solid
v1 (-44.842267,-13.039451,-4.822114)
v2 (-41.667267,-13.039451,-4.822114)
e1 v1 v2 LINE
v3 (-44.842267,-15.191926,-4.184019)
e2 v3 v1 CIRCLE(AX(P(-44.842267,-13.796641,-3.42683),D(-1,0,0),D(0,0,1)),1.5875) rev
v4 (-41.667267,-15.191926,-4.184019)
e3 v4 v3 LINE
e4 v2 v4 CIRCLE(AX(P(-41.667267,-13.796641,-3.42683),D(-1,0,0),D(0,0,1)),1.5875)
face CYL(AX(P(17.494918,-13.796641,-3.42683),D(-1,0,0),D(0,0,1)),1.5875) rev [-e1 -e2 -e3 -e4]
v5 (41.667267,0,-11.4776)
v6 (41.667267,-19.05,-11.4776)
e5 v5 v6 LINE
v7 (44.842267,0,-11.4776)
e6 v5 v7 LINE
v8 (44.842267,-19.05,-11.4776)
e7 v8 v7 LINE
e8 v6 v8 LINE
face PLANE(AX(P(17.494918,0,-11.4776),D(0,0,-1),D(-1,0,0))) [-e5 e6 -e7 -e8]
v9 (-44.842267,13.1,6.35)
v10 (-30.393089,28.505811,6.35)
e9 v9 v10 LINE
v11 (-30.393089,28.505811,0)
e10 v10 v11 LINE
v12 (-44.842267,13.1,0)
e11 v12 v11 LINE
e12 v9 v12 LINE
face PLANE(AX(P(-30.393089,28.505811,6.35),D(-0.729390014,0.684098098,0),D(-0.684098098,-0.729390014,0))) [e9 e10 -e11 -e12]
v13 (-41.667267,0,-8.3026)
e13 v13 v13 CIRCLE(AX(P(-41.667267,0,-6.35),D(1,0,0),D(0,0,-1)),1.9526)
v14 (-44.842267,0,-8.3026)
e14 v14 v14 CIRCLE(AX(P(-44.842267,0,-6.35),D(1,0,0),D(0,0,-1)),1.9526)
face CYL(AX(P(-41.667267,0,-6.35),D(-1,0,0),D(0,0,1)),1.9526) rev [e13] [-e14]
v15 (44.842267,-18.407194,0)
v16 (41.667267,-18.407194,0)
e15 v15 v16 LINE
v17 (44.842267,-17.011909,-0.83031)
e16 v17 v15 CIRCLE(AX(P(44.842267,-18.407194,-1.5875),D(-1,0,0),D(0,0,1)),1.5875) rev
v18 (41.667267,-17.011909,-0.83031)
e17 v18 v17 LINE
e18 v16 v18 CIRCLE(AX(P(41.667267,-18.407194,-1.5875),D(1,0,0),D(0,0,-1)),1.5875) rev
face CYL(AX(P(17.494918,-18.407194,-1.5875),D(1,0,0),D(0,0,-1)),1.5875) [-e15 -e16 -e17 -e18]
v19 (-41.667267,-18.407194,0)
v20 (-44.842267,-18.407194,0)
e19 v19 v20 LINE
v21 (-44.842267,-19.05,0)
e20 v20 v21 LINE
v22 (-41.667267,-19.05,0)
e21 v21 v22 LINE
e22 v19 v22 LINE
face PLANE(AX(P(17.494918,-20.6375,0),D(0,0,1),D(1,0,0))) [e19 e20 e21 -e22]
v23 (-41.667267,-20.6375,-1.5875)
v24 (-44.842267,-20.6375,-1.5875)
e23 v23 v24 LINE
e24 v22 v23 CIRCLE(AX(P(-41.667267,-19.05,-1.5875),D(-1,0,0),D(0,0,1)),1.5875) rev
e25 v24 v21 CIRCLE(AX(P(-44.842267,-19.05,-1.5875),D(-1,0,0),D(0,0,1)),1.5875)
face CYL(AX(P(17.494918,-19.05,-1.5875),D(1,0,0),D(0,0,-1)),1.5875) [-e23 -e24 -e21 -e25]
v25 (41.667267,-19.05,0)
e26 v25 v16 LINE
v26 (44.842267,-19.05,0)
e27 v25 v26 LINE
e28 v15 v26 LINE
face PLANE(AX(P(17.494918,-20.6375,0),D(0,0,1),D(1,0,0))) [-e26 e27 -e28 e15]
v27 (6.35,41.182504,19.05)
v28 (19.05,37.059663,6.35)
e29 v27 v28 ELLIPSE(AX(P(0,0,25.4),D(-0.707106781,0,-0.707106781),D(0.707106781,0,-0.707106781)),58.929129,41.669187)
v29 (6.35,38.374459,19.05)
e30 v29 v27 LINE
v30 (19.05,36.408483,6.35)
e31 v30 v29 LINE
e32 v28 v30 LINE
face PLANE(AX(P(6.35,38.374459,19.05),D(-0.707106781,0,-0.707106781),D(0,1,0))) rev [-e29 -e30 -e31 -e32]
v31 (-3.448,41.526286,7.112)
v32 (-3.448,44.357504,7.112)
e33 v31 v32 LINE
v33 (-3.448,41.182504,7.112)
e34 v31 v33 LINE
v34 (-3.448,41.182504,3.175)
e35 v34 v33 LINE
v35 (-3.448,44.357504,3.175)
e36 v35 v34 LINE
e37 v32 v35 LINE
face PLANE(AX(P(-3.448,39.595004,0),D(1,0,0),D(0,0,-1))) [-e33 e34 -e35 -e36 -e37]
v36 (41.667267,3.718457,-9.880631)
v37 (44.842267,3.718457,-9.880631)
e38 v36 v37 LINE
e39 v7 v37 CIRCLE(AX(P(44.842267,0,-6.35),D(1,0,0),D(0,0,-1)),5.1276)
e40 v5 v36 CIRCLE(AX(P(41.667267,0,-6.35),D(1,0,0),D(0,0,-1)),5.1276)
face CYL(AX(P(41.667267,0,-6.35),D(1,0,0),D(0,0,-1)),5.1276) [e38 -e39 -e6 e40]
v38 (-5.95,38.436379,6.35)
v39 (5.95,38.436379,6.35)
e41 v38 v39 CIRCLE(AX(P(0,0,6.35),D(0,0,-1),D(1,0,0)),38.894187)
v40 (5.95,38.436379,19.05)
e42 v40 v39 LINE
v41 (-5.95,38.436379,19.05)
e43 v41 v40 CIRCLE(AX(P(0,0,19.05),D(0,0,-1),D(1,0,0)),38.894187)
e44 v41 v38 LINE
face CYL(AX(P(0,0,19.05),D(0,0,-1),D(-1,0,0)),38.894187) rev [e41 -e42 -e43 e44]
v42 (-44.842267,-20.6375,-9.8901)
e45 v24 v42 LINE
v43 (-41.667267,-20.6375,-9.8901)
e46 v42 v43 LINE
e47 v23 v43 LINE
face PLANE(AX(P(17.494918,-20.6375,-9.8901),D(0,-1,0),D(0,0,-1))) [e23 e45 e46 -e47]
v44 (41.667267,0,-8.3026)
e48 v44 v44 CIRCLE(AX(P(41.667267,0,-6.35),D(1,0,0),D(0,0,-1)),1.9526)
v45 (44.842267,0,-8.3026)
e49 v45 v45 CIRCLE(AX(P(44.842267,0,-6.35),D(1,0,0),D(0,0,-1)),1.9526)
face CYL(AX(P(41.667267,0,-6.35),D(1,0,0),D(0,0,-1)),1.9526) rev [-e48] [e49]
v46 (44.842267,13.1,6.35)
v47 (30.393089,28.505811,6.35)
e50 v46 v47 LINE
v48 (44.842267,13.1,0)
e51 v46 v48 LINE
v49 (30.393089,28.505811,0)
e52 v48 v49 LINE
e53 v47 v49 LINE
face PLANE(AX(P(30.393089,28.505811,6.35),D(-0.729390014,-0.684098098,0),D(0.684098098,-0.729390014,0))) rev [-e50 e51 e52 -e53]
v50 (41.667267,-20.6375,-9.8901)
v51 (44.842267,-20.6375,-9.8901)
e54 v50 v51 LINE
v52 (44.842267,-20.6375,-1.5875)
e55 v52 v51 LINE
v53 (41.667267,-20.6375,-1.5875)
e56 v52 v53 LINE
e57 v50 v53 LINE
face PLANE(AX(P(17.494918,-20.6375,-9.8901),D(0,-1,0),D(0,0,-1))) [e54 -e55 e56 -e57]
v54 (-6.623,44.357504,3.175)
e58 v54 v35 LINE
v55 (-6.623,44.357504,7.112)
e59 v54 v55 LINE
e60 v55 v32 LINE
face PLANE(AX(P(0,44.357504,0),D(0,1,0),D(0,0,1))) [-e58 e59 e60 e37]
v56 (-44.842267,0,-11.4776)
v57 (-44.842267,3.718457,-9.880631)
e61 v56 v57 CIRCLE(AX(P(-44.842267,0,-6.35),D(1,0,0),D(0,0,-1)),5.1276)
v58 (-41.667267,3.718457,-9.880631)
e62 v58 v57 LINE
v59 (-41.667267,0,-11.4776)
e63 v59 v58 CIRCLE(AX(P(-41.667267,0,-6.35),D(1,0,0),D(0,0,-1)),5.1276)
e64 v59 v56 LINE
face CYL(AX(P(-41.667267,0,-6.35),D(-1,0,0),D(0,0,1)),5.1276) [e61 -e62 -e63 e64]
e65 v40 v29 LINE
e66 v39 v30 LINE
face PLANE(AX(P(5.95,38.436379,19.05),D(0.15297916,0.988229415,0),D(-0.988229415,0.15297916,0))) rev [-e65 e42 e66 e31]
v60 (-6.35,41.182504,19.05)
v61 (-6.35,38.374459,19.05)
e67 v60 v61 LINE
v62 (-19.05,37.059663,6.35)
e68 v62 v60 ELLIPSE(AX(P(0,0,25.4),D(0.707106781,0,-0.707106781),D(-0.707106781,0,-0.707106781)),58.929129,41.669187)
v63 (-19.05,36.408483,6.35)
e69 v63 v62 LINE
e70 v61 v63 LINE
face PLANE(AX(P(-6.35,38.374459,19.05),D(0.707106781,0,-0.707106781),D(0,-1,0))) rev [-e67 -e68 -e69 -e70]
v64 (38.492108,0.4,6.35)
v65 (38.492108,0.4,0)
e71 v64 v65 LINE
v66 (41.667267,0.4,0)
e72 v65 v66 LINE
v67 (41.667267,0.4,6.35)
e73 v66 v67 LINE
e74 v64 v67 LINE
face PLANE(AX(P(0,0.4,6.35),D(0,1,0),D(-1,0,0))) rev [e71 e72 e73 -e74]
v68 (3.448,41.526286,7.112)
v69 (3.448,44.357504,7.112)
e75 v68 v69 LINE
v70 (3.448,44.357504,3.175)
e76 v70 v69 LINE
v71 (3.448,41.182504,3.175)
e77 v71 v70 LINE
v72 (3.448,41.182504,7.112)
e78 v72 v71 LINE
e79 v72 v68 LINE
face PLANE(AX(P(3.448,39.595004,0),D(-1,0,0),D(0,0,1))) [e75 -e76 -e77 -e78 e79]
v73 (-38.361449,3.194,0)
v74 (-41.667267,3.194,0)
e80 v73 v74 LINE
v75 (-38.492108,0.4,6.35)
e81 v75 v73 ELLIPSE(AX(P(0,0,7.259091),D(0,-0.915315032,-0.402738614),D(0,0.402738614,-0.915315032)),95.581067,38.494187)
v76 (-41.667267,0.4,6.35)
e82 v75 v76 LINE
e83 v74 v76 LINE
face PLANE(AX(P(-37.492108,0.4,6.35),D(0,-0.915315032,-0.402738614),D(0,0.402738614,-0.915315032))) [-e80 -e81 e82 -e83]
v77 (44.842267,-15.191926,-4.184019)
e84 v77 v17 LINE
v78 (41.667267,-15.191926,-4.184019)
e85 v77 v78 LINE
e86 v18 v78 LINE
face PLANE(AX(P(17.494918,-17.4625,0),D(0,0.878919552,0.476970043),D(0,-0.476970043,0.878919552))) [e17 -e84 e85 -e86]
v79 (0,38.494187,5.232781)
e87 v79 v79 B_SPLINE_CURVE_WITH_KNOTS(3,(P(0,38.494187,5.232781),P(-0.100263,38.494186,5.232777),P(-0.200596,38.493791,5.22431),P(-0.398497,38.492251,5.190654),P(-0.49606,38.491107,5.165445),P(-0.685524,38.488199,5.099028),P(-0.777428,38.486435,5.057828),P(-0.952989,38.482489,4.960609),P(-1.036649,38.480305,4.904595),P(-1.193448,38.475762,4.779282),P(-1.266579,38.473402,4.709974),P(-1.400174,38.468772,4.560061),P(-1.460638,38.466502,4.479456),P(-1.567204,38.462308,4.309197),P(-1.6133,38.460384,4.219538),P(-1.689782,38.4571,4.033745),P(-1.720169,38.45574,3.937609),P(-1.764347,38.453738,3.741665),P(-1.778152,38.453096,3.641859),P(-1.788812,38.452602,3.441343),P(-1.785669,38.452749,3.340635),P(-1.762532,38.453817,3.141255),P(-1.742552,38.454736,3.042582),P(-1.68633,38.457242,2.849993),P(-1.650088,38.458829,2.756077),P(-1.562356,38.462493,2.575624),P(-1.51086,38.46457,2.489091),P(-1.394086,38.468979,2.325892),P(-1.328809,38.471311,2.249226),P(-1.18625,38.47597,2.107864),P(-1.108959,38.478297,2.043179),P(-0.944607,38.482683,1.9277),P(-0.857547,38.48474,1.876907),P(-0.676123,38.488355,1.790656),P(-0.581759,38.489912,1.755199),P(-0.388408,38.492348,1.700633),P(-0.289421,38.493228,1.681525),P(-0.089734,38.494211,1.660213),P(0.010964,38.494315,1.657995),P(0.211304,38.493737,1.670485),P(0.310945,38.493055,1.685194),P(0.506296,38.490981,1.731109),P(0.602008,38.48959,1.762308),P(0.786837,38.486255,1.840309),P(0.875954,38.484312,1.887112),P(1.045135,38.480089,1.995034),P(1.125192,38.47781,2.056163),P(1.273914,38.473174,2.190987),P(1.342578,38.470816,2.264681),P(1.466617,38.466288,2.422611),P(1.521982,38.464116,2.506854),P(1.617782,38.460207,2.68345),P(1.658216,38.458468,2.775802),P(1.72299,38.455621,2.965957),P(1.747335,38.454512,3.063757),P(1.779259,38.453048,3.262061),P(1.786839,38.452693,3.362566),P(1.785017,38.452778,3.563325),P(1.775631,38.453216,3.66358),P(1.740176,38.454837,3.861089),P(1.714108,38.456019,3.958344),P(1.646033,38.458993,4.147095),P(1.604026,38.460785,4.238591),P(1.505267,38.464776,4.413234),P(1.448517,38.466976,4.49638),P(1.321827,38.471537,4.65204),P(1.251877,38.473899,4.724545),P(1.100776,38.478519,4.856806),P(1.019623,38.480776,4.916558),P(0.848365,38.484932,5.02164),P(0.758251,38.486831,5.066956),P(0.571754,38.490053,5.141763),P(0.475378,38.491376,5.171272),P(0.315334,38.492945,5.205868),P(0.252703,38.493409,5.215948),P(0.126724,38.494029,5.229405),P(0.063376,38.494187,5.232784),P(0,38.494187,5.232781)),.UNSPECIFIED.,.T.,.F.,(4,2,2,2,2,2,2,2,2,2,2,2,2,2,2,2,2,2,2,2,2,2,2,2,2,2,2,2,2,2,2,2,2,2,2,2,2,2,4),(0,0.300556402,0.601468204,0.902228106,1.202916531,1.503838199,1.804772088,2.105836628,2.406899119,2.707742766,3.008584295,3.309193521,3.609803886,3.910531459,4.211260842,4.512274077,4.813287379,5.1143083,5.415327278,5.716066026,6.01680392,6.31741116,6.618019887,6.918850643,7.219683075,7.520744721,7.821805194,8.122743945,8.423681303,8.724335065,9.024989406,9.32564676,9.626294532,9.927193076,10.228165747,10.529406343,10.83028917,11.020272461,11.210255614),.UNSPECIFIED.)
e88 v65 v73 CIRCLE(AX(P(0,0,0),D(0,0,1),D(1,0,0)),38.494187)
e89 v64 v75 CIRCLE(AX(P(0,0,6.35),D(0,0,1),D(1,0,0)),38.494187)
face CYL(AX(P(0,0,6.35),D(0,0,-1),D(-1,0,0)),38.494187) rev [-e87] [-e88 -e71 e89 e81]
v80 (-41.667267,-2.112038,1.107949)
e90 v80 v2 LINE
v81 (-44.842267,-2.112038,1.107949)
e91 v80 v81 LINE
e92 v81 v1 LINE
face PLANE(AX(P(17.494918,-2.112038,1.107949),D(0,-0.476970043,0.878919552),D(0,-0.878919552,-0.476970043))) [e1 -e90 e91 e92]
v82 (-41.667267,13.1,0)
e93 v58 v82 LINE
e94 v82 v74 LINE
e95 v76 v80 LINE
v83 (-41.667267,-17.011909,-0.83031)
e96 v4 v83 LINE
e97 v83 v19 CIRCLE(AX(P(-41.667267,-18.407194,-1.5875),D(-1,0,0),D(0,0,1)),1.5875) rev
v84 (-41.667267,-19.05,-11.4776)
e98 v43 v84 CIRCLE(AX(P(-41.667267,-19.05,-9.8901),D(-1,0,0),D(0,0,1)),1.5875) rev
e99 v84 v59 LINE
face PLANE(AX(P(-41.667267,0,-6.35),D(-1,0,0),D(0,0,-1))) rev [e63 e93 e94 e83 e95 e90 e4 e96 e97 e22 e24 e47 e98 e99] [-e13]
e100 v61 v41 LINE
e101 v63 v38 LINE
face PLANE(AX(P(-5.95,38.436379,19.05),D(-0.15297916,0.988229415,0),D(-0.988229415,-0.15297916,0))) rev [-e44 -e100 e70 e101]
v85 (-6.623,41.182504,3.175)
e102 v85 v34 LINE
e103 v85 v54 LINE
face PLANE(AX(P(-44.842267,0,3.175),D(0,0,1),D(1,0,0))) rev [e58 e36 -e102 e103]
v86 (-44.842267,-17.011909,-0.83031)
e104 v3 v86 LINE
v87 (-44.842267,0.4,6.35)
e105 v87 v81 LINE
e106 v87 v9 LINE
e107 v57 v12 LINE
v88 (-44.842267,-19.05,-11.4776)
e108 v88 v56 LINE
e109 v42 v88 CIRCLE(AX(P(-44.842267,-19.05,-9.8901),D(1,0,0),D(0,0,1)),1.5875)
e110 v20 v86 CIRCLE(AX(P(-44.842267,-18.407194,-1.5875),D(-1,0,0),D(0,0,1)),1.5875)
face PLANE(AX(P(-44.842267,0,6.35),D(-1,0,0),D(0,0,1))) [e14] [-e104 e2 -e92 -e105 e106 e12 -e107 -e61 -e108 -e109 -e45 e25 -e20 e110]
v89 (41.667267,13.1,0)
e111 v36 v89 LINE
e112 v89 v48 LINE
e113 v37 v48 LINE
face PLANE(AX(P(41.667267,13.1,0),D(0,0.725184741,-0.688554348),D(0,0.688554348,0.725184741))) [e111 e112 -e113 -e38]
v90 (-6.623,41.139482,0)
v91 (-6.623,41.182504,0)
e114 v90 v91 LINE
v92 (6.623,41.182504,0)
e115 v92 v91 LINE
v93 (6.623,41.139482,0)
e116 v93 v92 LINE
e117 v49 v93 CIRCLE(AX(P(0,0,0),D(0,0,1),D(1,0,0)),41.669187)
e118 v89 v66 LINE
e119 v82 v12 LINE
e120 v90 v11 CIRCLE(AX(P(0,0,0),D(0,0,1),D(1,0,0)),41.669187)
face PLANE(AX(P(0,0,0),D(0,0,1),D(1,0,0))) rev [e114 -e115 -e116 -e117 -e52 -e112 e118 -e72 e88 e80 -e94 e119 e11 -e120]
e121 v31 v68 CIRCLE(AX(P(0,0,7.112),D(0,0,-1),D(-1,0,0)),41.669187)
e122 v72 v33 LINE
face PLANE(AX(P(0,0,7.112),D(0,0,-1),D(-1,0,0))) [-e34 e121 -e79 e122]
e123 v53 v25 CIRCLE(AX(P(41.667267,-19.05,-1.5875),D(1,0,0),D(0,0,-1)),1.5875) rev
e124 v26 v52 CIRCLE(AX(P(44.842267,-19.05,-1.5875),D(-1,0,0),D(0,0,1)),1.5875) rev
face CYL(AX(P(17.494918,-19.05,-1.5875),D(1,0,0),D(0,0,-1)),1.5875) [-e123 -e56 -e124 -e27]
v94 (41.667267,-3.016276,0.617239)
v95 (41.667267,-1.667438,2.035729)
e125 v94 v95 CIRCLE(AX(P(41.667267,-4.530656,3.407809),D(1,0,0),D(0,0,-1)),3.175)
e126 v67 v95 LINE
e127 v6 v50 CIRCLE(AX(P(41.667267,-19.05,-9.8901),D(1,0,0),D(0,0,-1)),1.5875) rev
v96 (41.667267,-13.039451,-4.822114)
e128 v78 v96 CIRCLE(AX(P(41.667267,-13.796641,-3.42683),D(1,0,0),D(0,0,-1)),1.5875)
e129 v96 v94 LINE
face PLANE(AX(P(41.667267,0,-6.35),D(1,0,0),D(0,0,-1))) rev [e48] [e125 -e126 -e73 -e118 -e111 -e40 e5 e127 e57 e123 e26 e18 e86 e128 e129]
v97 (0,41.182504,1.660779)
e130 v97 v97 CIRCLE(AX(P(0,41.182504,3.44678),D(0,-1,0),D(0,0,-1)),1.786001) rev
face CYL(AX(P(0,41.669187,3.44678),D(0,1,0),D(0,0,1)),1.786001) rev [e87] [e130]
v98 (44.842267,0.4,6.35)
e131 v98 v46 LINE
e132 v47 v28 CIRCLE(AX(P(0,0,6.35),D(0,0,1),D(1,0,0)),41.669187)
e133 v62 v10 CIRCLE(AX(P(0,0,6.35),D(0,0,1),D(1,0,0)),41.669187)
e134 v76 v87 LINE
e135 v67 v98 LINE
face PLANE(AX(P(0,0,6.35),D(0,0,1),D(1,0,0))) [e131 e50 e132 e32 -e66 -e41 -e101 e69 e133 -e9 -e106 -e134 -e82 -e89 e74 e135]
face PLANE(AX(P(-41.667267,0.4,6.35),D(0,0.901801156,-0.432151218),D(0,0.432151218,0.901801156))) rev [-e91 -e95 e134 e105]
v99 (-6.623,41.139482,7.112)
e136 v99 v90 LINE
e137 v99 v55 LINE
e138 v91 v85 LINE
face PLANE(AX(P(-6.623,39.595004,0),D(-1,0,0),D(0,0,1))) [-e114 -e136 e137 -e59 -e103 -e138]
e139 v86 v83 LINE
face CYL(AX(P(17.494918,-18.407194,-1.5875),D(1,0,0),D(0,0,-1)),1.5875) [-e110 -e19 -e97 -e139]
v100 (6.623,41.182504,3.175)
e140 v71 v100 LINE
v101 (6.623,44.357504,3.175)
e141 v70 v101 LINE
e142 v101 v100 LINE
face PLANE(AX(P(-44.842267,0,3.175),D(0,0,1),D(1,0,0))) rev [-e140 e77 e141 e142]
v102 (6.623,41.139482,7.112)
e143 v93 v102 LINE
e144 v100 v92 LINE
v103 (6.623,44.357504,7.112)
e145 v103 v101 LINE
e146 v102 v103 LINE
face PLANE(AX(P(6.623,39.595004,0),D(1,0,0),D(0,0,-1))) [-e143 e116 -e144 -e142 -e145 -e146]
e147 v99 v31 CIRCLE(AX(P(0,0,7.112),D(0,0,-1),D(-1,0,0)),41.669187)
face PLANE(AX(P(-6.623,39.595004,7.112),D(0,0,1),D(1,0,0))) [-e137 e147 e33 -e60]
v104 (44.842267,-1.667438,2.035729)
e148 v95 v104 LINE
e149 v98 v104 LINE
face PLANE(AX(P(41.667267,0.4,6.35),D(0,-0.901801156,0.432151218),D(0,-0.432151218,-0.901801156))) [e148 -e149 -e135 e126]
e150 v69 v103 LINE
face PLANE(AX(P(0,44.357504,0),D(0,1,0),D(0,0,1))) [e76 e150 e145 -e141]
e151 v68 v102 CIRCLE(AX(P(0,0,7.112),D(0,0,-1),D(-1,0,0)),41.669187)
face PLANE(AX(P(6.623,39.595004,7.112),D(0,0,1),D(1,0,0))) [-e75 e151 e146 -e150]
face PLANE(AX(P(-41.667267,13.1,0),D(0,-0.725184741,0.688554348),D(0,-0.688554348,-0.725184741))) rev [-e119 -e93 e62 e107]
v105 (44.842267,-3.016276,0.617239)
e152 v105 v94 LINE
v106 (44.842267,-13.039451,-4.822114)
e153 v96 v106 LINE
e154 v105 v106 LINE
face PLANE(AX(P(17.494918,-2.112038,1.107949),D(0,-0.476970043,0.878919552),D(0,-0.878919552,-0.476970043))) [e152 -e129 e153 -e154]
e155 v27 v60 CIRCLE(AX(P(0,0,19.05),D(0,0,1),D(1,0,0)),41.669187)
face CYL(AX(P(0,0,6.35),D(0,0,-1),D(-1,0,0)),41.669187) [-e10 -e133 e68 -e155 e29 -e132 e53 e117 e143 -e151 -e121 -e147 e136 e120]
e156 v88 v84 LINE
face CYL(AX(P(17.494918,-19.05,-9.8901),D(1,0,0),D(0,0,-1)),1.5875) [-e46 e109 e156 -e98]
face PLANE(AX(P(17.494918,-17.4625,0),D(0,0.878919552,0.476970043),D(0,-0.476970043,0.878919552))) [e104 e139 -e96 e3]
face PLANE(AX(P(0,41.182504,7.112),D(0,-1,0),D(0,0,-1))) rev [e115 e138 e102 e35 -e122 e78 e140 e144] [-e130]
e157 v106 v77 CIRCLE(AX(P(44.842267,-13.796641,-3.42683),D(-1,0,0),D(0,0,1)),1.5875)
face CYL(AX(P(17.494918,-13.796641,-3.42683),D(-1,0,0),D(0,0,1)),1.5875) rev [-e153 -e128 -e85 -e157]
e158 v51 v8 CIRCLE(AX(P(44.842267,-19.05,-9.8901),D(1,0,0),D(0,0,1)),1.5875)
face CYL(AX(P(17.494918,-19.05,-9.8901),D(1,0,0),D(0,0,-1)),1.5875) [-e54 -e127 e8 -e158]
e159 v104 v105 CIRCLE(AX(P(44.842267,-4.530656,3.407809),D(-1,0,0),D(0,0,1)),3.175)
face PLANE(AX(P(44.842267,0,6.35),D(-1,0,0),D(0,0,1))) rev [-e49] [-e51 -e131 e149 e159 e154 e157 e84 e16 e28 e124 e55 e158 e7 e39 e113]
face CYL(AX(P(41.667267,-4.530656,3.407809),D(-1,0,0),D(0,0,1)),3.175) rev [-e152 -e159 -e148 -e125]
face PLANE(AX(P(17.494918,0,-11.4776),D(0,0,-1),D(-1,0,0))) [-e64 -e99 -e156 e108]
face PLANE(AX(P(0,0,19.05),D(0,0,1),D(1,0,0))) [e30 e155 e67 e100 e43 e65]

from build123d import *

# Parameters (mm, degrees)
BOSS_EXTRUDE1_DEPTH                 = 6.35
SKETCH2_R                           = 1.9526
BOSS_EXTRUDE2_DEPTH                 = 3.175
CUT_EXTRUDE1_DEPTH                  = 3.175158
CUT_EXTRUDE1_DIRECTION_2_REACH      = 95.876
CUT_EXTRUDE1_DIRECTION_2_END_RADIUS = 38.494186542
BOSS_EXTRUDE3_DEPTH                 = 12.7
CHAMFER2_SIZE                       = 12.7
F_9_64_0_14063_DIAMETER_HOLE1_D     = 3.572002
CUT_EXTRUDE4_DEPTH                  = 7.112
BOSS_EXTRUDE4_DEPTH                 = 3.175
BOSS_EXTRUDE4_DEPTH_BACK            = 1.5875
SKETCH12_W                          = 3.175
SKETCH12_H                          = 7.112
BOSS_EXTRUDE6_START                 = -89.684533
BOSS_EXTRUDE6_DEPTH                 = 89.684533
FILLET5_R                           = 3.175
SKETCH18_W                          = 83.334533228
SKETCH18_H                          = 26.913353796
CUT_EXTRUDE8_DEPTH                  = 71.073899328
CUT_EXTRUDE6_DEPTH                  = 71.563193649
CUT_EXTRUDE6_DEPTH_BACK             = 71.563193649
SKETCH15_W                          = 3.175
SKETCH15_H                          = 3.175
FILLET6_R                           = 1.5875


with BuildPart() as part:
    # Sketch1 → Boss-Extrude1 (new body)
    with BuildSketch(Plane.XY):
        with BuildLine():
            Line((44.842266614, 13.1), (30.393088537, 28.505811271))
            ThreePointArc((30.393088537, 28.505811271), (0, 41.669186542), (-30.393088537, 28.505811271))
            Line((-30.393088537, 28.505811271), (-44.842266614, 13.1))
            Line((-44.842266614, 13.1), (-44.842266614, 0.4))
            Line((-44.842266614, 0.4), (-41.667266614, 0.4))
            Line((-41.667266614, 0.4), (-38.49210825, 0.4))
            ThreePointArc((-38.49210825, 0.4), (0, 38.494186542), (38.49210825, 0.4))
            Line((38.49210825, 0.4), (41.667266614, 0.4))
            Line((41.667266614, 0.4), (44.842266614, 0.4))
            Line((44.842266614, 0.4), (44.842266614, 13.1))
        make_face()
    extrude(amount=BOSS_EXTRUDE1_DEPTH)

    # Sketch2 → Boss-Extrude2 (add)
    with BuildSketch(Plane(origin=(44.842266614, 0, 0), x_dir=(0, 0, -1), z_dir=(1, 0, 0))):
        with BuildLine():
            Line((0, 13.1), (9.880631277, 3.71845728))
            ThreePointArc((9.880631277, 3.71845728), (10.572747241, -2.908726095), (4.134101417, -4.624075608))
            Line((4.134101417, -4.624075608), (-6.35, 0.4))
            Line((-6.35, 0.4), (0, 0.4))
            Line((0, 0.4), (0, 13.1))
        make_face()
        with Locations((6.35, 0)):
            Circle(SKETCH2_R, mode=Mode.SUBTRACT)
    boss_extrude2 = extrude(amount=-BOSS_EXTRUDE2_DEPTH)

    # Mirror1: Boss-Extrude2 across plane
    add(boss_extrude2.mirror(Plane(origin=(0, 0, 0), x_dir=(0, 0, 1), z_dir=(1, 0, 0))))

    # Sketch4 → Cut-Extrude1 (cut)
    with BuildSketch(Plane(origin=(-38.49210825, 0, 0), x_dir=(0, 0, -1), z_dir=(1, 0, 0))):
        Polygon((-6.35, 0.4), (0, 3.194), (0, 0.4), align=None)
    extrude(amount=-CUT_EXTRUDE1_DEPTH, mode=Mode.SUBTRACT)

    # Cut-Extrude1 direction 2: up to this cylinder (the profile starts outside it)
    cut_extrude1_direction_2_end = Plane(origin=(0, 0, 2.116667), z_dir=(0, 0, -1)) * Cylinder(CUT_EXTRUDE1_DIRECTION_2_END_RADIUS, 269.740373084, mode=Mode.PRIVATE)
    # Sketch4 → Cut-Extrude1 direction 2 (cut, up to the surface)
    with BuildSketch(Plane(origin=(-38.49210825, 0, 0), x_dir=(0, 0, -1), z_dir=(1, 0, 0)), mode=Mode.PRIVATE) as cut_extrude1_direction_2_sk1:
        Polygon((-6.35, 0.4), (0, 3.194), (0, 0.4), align=None)
    cut_extrude1_direction_2_tool1 = extrude(cut_extrude1_direction_2_sk1.sketch, amount=CUT_EXTRUDE1_DIRECTION_2_REACH, mode=Mode.PRIVATE) - cut_extrude1_direction_2_end
    add(cut_extrude1_direction_2_tool1.solids().sort_by_distance((-38.492108, 1.331333, 2.116667))[0], mode=Mode.SUBTRACT)

    # Sketch5 → Boss-Extrude3 (add)
    with BuildSketch(Plane.XY.offset(6.35)):
        with BuildLine():
            Line((-6.35, 38.374458705), (-6.35, 41.182503652))
            ThreePointArc((-6.35, 41.182503652), (0, 41.669186542), (6.35, 41.182503652))
            Line((6.35, 41.182503652), (6.35, 38.374458705))
            Line((6.35, 38.374458705), (5.95, 38.43637921))
            ThreePointArc((5.95, 38.43637921), (0, 38.894186542), (-5.95, 38.43637921))
            Line((-5.95, 38.43637921), (-6.35, 38.374458705))
        make_face()
    extrude(amount=BOSS_EXTRUDE3_DEPTH)

    # Chamfer2
    # the kernel refuses this chamfer: 12.7 mm, written as the material it adds along each edge
    with BuildSketch(Plane(origin=(6.35, 73.842877599, 6.35), x_dir=(0.9996219169112968, 0, -0.02749587661058633), z_dir=(0, -1, 0))) as chamfer2_piece_1_section:
        Polygon((CHAMFER2_SIZE * 0.999621916911, CHAMFER2_SIZE * 0.0274958766106), (-CHAMFER2_SIZE * 0.0274958766106, CHAMFER2_SIZE * 0.999621916911), (0, 0), align=None)
    chamfer2_piece_1 = extrude(amount=68.128792841, mode=Mode.PRIVATE)
    chamfer2_piece_1 = chamfer2_piece_1 & Plane(origin=(0, 0, 10.815604597), x_dir=(0.7293900135753609, 0.6840980982991656, 0), z_dir=(0, 0, -1)) * Cylinder(41.669186542, 188, mode=Mode.PRIVATE)
    chamfer2_piece_1 = split(chamfer2_piece_1, bisect_by=Plane(origin=(9.796586026, 37.840922839, 10.815604597), z_dir=(0.15297916035843936, 0.988229414911349, 0)), keep=Keep.TOP, mode=Mode.PRIVATE)
    chamfer2_piece_1 = split(chamfer2_piece_1, bisect_by=Plane(origin=(9.988062905, 39.077843499, 19.05), z_dir=(0, 0, -1)), keep=Keep.TOP, mode=Mode.PRIVATE)
    add(chamfer2_piece_1)
    with BuildSketch(Plane(origin=(-6.35, 5.714084758, 6.35), x_dir=(-0.9996219169112966, 0, -0.0274958766105864), z_dir=(0, 1, 0))) as chamfer2_piece_2_section:
        Polygon((CHAMFER2_SIZE * 0.999621916911, CHAMFER2_SIZE * 0.0274958766106), (-CHAMFER2_SIZE * 0.0274958766106, CHAMFER2_SIZE * 0.999621916911), (0, 0), align=None)
    chamfer2_piece_2 = extrude(amount=68.128792841, mode=Mode.PRIVATE)
    chamfer2_piece_2 = chamfer2_piece_2 & Plane(origin=(0, 0, 10.81560458), x_dir=(0.7293900135753609, 0.6840980982991656, 0), z_dir=(0, 0, -1)) * Cylinder(41.669186542, 188, mode=Mode.PRIVATE)
    chamfer2_piece_2 = split(chamfer2_piece_2, bisect_by=Plane(origin=(-9.796586033, 37.840922838, 10.81560458), z_dir=(-0.15297916035843936, 0.988229414911349, 0)), keep=Keep.TOP, mode=Mode.PRIVATE)
    chamfer2_piece_2 = split(chamfer2_piece_2, bisect_by=Plane(origin=(-9.988062912, 39.077843496, 19.05), z_dir=(0, 0, -1)), keep=Keep.TOP, mode=Mode.PRIVATE)
    add(chamfer2_piece_2)

    # 9/64 (0.14063) Diameter Hole1 (through all)
    with Locations(Plane(origin=(0, 41.669186542, 0), x_dir=(1, 0, 0), z_dir=(0, 1, 0))):
        with Locations((0, -3.44678)):
            Hole(F_9_64_0_14063_DIAMETER_HOLE1_D / 2)

    # Sketch11 → Cut-Extrude4 (cut)
    with BuildSketch(Plane(origin=(0, 0, 0), x_dir=(-1, 0, 0), z_dir=(0, 0, -1))):
        with BuildLine():
            ThreePointArc((6.35, 41.182503652), (0, 41.669186542), (-6.35, 41.182503652))
            Line((-6.35, 41.182503652), (6.35, 41.182503652))
        make_face()
    extrude(amount=-CUT_EXTRUDE4_DEPTH, mode=Mode.SUBTRACT)

    # Sketch12 → Boss-Extrude4 (add, two sides: drawn at the far end of the back side and taken through both)
    with BuildSketch(Plane(origin=(0, 41.182503652, 0), x_dir=(1, 0, 0), z_dir=(0, 1, 0)).offset(-BOSS_EXTRUDE4_DEPTH_BACK)):
        with Locations((-5.0355, -3.556)):
            Rectangle(SKETCH12_W, SKETCH12_H)
        with Locations((5.0355, -3.556)):
            Rectangle(SKETCH12_W, SKETCH12_H)
    extrude(amount=BOSS_EXTRUDE4_DEPTH + BOSS_EXTRUDE4_DEPTH_BACK)

    # Sketch16 → Boss-Extrude6 (add)
    with BuildSketch(Plane(origin=(44.842266614, 0, 0), x_dir=(0, 0, -1), z_dir=(1, 0, 0)).offset(BOSS_EXTRUDE6_START)):
        with BuildLine():
            Line((-1.107949291, -2.112037804), (5.579304246, -14.434735992))
            Line((5.579304246, -14.434735992), (0, -17.4625))
            Line((0, -17.4625), (0, -20.6375))
            Line((0, -20.6375), (9.8901, -20.6375))
            ThreePointArc((9.8901, -20.6375), (11.012632015, -20.172532015), (11.4776, -19.05))
            Line((11.4776, -19.05), (11.4776, 0))
            ThreePointArc((11.4776, 0), (9.082218896, -4.339039256), (4.134101417, -4.624075608))
            Line((4.134101417, -4.624075608), (-1.107949291, -2.112037804))
        make_face()
    boss_extrude6 = extrude(amount=BOSS_EXTRUDE6_DEPTH)

    # Fillet5
    fillet5_edges = [part.edges().sort_by_distance(p)[0] for p in [
        (43.254766614, -2.112037804, 1.107949291),
    ]]
    fillet(fillet5_edges, radius=FILLET5_R)

    # Mirror4: Boss-Extrude6 across plane
    add(boss_extrude6.mirror(Plane(origin=(0, 0, 0), x_dir=(0, 0, 1), z_dir=(1, 0, 0))))

    # Sketch18 → Cut-Extrude8 (cut, through all)
    with BuildSketch(Plane(origin=(0, 0, -11.4776), x_dir=(-1, 0, 0), z_dir=(0, 0, -1))):
        with Locations((0, -13.456676898)):
            Rectangle(SKETCH18_W, SKETCH18_H)
    extrude(amount=-CUT_EXTRUDE8_DEPTH, mode=Mode.SUBTRACT)

    # Sketch15 → Cut-Extrude6 (cut, two sides: drawn at the far end of the back side and taken through both)
    with BuildSketch(Plane(origin=(6.623, 0, 0), x_dir=(0, 0, -1), z_dir=(1, 0, 0)).offset(-CUT_EXTRUDE6_DEPTH_BACK)):
        with Locations((-1.5875, 42.770003652)):
            Rectangle(SKETCH15_W, SKETCH15_H)
    extrude(amount=CUT_EXTRUDE6_DEPTH + CUT_EXTRUDE6_DEPTH_BACK, mode=Mode.SUBTRACT)

    # Fillet6
    fillet6_edges = [part.edges().sort_by_distance(p)[0] for p in [
        (-43.2547665, -20.6375, 0),
        (-43.2547665, -17.4625, 0),
        (-43.2547665, -14.434735992, -5.579304246),
        (43.254766614, -14.434735992, -5.579304246),
        (43.254766614, -17.4625, 0),
        (43.254766614, -20.6375, 0),
    ]]
    fillet(fillet6_edges, radius=FILLET6_R)


solid = part.part
